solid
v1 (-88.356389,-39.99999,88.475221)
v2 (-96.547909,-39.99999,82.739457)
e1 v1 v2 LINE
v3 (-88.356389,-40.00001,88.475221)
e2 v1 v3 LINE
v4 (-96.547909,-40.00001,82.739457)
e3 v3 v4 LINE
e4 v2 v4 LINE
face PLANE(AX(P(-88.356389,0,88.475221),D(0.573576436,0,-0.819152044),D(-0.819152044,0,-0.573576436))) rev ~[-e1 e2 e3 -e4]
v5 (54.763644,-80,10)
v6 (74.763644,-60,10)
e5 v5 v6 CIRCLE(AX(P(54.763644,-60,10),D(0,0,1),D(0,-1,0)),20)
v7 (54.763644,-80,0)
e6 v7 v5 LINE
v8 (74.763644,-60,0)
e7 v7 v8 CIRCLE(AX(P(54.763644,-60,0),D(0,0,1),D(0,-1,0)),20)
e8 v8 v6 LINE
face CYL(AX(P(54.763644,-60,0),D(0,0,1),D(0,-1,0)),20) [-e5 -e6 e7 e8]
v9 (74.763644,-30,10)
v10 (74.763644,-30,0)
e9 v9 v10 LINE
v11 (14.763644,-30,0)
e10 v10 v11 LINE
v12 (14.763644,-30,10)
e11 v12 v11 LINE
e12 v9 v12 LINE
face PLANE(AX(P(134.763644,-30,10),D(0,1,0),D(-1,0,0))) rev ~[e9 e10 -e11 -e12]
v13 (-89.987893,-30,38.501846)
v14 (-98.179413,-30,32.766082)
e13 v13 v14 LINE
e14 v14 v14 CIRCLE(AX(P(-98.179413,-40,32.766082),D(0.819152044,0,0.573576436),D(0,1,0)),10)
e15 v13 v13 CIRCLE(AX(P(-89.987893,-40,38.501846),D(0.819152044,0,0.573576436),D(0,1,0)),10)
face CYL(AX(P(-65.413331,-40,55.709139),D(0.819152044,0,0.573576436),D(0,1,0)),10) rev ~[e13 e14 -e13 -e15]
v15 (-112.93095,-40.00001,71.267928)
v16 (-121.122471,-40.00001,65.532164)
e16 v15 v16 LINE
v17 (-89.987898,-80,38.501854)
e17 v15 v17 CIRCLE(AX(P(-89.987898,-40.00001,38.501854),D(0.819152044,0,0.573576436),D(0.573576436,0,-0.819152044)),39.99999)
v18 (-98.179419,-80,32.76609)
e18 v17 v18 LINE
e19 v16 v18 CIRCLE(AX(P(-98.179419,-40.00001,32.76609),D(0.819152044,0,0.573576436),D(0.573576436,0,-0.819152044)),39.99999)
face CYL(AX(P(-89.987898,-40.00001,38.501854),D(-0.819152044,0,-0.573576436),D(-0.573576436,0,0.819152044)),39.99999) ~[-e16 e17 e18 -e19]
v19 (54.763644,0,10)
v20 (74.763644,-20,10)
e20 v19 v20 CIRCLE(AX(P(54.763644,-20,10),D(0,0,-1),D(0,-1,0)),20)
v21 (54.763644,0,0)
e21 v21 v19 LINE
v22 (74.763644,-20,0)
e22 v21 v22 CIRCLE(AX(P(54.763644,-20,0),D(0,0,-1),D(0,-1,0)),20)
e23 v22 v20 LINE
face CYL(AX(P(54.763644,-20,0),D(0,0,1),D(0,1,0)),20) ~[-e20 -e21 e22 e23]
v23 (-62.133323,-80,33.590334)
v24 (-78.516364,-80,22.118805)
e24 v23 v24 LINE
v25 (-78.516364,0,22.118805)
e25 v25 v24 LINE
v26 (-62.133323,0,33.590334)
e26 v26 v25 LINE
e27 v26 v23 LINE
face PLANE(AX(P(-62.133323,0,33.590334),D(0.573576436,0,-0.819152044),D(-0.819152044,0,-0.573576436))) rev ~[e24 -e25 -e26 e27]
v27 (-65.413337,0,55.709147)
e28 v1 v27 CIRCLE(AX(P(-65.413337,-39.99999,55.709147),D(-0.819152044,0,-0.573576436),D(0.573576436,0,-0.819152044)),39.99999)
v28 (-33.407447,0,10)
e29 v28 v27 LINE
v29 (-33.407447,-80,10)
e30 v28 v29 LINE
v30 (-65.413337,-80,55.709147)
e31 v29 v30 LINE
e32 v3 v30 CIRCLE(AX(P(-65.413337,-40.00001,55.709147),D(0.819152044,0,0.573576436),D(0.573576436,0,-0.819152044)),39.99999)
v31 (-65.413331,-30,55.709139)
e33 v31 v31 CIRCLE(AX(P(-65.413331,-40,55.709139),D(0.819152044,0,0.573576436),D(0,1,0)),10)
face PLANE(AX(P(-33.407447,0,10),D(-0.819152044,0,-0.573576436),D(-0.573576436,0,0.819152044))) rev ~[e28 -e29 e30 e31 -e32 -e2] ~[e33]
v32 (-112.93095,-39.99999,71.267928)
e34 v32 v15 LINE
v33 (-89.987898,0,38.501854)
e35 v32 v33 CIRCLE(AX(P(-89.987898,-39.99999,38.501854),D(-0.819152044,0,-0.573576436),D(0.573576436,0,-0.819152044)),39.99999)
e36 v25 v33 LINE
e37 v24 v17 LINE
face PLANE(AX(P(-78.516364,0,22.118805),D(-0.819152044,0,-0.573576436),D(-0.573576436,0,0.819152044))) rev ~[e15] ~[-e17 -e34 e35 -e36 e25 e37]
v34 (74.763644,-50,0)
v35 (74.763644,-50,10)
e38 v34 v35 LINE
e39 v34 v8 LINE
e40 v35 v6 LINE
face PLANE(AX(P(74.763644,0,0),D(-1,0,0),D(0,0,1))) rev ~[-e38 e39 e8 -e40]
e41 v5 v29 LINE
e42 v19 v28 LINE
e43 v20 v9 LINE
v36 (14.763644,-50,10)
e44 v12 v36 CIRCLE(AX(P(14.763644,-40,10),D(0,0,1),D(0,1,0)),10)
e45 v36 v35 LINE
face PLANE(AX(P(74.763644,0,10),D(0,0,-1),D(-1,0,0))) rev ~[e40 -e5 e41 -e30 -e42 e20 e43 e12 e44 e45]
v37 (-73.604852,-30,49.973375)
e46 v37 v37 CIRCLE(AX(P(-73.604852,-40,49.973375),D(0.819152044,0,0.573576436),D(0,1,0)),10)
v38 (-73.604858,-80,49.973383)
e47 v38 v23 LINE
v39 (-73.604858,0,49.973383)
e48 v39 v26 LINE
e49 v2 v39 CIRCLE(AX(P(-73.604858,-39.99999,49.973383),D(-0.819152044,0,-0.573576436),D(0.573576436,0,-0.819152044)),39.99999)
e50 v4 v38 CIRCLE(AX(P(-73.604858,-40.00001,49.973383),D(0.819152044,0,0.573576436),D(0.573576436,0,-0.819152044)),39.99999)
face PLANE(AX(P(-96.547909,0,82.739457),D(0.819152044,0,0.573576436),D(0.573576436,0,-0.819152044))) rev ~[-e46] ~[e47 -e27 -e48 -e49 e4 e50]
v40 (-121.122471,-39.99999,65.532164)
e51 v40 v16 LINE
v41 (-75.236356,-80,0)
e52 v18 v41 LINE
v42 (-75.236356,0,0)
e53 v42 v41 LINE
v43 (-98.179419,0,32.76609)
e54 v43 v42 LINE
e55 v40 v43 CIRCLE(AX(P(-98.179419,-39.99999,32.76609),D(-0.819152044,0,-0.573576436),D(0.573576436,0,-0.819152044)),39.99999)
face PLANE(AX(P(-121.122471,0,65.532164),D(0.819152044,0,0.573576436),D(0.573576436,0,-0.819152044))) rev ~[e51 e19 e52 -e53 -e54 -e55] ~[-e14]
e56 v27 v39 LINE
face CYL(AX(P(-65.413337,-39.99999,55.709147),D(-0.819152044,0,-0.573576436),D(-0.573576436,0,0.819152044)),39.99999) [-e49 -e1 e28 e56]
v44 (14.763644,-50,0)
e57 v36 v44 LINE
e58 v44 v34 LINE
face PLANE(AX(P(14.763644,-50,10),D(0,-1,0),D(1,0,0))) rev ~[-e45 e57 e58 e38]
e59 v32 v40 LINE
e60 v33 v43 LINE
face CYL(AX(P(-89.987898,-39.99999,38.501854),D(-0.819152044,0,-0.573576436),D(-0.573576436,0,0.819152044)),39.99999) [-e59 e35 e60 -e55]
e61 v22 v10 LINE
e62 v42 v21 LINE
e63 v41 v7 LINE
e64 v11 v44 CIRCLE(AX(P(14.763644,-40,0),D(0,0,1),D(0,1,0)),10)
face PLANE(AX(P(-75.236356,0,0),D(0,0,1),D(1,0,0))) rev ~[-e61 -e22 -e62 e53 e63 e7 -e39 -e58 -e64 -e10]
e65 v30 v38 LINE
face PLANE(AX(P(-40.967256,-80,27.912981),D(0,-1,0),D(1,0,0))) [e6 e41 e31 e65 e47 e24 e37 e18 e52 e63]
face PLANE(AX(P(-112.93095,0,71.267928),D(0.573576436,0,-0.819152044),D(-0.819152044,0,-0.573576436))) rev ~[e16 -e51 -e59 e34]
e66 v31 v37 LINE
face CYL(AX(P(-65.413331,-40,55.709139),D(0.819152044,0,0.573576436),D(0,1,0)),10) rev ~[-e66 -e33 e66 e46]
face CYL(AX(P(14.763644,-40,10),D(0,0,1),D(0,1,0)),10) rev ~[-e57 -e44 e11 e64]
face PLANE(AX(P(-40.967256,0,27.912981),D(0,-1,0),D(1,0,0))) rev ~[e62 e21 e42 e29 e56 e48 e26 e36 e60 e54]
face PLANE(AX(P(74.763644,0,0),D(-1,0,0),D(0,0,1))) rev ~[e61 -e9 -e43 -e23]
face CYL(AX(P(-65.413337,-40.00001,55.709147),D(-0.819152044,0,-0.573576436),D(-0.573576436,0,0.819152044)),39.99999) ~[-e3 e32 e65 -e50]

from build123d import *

# Parameters (mm, degrees)
F1_DEPTH = 80
F2_R     = 39.99999
F4_DEPTH = 25
F5_R     = 20
F6_R     = 10
F7_DEPTH = 57.1


# Not quite as in the source:
# - a fillet or chamfer is up to 0.001 mm smaller than in the source, because OpenCascade refuses the exact size


with BuildPart() as f1:
    # F0 (on Front) → F1 (new body)
    with BuildSketch(Plane.XZ):
        Polygon((-121.122470571, 65.5321635431), (-75.236355663, 0), (74.763644337, 0), (74.763644337, 10), (-25.236355663, 10), (-33.4074474946, 10), (-88.3563887995, 88.4752209972), (-96.5479092424, 82.7394566337), (-62.1333230613, 33.5903339763), (-78.5163639471, 22.1188052493), (-112.9309501282, 71.2679279066), align=None)
    extrude(amount=F1_DEPTH)

    # F2 (radius 40 in the source; OpenCascade refuses exactly that, so slightly less here)
    f2_edges = [f1.edges().sort_by_distance(p)[0] for p in [
        (-92.452149, -80, 85.607339),
        (-117.02671, -80, 68.400046),
        (-92.452149, 0, 85.607339),
        (-117.02671, 0, 68.400046),
    ]]
    fillet(f2_edges, radius=F2_R)

    # F3 (on face) → F4 (cut)
    with BuildSketch(Plane.XY.offset(10)):
        with BuildLine():
            ThreePointArc((24.763644337, -40), (21.8347121489, -47.0710678119), (14.763644337, -50))
            Line((14.763644337, -50), (134.763644337, -50))
            Line((134.763644337, -50), (134.763644337, -30))
            Line((134.763644337, -30), (14.763644337, -30))
            ThreePointArc((14.763644337, -30), (21.8347121489, -32.9289321881), (24.763644337, -40))
        make_face()
        with BuildLine():
            ThreePointArc((14.763644337, -30), (4.763644337, -40), (14.763644337, -50))
            Line((14.763644337, -50), (14.763644337, -30))
        make_face()
        with BuildLine():
            Line((14.763644337, -30), (14.763644337, -50))
            ThreePointArc((14.763644337, -50), (21.8347121489, -47.0710678119), (24.763644337, -40))
            ThreePointArc((24.763644337, -40), (21.8347121489, -32.9289321881), (14.763644337, -30))
        make_face()
    extrude(amount=-F4_DEPTH, mode=Mode.SUBTRACT)

    # F5
    f5_edges = [f1.edges().sort_by_distance(p)[0] for p in [
        (74.763644, 0, 5),
        (74.763644, -80, 5),
    ]]
    fillet(f5_edges, radius=F5_R)

    # F6 (on face) → F7 (cut)
    with BuildSketch(Plane(origin=(-17.7182706335, 0, -12.4064666616), x_dir=(0, 1, 0), z_dir=(0.8191520443, 0, 0.5735764364))):
        with Locations((-40, 83.1538007652)):
            Circle(F6_R)
    extrude(amount=-F7_DEPTH, mode=Mode.SUBTRACT)


solid = f1.part
